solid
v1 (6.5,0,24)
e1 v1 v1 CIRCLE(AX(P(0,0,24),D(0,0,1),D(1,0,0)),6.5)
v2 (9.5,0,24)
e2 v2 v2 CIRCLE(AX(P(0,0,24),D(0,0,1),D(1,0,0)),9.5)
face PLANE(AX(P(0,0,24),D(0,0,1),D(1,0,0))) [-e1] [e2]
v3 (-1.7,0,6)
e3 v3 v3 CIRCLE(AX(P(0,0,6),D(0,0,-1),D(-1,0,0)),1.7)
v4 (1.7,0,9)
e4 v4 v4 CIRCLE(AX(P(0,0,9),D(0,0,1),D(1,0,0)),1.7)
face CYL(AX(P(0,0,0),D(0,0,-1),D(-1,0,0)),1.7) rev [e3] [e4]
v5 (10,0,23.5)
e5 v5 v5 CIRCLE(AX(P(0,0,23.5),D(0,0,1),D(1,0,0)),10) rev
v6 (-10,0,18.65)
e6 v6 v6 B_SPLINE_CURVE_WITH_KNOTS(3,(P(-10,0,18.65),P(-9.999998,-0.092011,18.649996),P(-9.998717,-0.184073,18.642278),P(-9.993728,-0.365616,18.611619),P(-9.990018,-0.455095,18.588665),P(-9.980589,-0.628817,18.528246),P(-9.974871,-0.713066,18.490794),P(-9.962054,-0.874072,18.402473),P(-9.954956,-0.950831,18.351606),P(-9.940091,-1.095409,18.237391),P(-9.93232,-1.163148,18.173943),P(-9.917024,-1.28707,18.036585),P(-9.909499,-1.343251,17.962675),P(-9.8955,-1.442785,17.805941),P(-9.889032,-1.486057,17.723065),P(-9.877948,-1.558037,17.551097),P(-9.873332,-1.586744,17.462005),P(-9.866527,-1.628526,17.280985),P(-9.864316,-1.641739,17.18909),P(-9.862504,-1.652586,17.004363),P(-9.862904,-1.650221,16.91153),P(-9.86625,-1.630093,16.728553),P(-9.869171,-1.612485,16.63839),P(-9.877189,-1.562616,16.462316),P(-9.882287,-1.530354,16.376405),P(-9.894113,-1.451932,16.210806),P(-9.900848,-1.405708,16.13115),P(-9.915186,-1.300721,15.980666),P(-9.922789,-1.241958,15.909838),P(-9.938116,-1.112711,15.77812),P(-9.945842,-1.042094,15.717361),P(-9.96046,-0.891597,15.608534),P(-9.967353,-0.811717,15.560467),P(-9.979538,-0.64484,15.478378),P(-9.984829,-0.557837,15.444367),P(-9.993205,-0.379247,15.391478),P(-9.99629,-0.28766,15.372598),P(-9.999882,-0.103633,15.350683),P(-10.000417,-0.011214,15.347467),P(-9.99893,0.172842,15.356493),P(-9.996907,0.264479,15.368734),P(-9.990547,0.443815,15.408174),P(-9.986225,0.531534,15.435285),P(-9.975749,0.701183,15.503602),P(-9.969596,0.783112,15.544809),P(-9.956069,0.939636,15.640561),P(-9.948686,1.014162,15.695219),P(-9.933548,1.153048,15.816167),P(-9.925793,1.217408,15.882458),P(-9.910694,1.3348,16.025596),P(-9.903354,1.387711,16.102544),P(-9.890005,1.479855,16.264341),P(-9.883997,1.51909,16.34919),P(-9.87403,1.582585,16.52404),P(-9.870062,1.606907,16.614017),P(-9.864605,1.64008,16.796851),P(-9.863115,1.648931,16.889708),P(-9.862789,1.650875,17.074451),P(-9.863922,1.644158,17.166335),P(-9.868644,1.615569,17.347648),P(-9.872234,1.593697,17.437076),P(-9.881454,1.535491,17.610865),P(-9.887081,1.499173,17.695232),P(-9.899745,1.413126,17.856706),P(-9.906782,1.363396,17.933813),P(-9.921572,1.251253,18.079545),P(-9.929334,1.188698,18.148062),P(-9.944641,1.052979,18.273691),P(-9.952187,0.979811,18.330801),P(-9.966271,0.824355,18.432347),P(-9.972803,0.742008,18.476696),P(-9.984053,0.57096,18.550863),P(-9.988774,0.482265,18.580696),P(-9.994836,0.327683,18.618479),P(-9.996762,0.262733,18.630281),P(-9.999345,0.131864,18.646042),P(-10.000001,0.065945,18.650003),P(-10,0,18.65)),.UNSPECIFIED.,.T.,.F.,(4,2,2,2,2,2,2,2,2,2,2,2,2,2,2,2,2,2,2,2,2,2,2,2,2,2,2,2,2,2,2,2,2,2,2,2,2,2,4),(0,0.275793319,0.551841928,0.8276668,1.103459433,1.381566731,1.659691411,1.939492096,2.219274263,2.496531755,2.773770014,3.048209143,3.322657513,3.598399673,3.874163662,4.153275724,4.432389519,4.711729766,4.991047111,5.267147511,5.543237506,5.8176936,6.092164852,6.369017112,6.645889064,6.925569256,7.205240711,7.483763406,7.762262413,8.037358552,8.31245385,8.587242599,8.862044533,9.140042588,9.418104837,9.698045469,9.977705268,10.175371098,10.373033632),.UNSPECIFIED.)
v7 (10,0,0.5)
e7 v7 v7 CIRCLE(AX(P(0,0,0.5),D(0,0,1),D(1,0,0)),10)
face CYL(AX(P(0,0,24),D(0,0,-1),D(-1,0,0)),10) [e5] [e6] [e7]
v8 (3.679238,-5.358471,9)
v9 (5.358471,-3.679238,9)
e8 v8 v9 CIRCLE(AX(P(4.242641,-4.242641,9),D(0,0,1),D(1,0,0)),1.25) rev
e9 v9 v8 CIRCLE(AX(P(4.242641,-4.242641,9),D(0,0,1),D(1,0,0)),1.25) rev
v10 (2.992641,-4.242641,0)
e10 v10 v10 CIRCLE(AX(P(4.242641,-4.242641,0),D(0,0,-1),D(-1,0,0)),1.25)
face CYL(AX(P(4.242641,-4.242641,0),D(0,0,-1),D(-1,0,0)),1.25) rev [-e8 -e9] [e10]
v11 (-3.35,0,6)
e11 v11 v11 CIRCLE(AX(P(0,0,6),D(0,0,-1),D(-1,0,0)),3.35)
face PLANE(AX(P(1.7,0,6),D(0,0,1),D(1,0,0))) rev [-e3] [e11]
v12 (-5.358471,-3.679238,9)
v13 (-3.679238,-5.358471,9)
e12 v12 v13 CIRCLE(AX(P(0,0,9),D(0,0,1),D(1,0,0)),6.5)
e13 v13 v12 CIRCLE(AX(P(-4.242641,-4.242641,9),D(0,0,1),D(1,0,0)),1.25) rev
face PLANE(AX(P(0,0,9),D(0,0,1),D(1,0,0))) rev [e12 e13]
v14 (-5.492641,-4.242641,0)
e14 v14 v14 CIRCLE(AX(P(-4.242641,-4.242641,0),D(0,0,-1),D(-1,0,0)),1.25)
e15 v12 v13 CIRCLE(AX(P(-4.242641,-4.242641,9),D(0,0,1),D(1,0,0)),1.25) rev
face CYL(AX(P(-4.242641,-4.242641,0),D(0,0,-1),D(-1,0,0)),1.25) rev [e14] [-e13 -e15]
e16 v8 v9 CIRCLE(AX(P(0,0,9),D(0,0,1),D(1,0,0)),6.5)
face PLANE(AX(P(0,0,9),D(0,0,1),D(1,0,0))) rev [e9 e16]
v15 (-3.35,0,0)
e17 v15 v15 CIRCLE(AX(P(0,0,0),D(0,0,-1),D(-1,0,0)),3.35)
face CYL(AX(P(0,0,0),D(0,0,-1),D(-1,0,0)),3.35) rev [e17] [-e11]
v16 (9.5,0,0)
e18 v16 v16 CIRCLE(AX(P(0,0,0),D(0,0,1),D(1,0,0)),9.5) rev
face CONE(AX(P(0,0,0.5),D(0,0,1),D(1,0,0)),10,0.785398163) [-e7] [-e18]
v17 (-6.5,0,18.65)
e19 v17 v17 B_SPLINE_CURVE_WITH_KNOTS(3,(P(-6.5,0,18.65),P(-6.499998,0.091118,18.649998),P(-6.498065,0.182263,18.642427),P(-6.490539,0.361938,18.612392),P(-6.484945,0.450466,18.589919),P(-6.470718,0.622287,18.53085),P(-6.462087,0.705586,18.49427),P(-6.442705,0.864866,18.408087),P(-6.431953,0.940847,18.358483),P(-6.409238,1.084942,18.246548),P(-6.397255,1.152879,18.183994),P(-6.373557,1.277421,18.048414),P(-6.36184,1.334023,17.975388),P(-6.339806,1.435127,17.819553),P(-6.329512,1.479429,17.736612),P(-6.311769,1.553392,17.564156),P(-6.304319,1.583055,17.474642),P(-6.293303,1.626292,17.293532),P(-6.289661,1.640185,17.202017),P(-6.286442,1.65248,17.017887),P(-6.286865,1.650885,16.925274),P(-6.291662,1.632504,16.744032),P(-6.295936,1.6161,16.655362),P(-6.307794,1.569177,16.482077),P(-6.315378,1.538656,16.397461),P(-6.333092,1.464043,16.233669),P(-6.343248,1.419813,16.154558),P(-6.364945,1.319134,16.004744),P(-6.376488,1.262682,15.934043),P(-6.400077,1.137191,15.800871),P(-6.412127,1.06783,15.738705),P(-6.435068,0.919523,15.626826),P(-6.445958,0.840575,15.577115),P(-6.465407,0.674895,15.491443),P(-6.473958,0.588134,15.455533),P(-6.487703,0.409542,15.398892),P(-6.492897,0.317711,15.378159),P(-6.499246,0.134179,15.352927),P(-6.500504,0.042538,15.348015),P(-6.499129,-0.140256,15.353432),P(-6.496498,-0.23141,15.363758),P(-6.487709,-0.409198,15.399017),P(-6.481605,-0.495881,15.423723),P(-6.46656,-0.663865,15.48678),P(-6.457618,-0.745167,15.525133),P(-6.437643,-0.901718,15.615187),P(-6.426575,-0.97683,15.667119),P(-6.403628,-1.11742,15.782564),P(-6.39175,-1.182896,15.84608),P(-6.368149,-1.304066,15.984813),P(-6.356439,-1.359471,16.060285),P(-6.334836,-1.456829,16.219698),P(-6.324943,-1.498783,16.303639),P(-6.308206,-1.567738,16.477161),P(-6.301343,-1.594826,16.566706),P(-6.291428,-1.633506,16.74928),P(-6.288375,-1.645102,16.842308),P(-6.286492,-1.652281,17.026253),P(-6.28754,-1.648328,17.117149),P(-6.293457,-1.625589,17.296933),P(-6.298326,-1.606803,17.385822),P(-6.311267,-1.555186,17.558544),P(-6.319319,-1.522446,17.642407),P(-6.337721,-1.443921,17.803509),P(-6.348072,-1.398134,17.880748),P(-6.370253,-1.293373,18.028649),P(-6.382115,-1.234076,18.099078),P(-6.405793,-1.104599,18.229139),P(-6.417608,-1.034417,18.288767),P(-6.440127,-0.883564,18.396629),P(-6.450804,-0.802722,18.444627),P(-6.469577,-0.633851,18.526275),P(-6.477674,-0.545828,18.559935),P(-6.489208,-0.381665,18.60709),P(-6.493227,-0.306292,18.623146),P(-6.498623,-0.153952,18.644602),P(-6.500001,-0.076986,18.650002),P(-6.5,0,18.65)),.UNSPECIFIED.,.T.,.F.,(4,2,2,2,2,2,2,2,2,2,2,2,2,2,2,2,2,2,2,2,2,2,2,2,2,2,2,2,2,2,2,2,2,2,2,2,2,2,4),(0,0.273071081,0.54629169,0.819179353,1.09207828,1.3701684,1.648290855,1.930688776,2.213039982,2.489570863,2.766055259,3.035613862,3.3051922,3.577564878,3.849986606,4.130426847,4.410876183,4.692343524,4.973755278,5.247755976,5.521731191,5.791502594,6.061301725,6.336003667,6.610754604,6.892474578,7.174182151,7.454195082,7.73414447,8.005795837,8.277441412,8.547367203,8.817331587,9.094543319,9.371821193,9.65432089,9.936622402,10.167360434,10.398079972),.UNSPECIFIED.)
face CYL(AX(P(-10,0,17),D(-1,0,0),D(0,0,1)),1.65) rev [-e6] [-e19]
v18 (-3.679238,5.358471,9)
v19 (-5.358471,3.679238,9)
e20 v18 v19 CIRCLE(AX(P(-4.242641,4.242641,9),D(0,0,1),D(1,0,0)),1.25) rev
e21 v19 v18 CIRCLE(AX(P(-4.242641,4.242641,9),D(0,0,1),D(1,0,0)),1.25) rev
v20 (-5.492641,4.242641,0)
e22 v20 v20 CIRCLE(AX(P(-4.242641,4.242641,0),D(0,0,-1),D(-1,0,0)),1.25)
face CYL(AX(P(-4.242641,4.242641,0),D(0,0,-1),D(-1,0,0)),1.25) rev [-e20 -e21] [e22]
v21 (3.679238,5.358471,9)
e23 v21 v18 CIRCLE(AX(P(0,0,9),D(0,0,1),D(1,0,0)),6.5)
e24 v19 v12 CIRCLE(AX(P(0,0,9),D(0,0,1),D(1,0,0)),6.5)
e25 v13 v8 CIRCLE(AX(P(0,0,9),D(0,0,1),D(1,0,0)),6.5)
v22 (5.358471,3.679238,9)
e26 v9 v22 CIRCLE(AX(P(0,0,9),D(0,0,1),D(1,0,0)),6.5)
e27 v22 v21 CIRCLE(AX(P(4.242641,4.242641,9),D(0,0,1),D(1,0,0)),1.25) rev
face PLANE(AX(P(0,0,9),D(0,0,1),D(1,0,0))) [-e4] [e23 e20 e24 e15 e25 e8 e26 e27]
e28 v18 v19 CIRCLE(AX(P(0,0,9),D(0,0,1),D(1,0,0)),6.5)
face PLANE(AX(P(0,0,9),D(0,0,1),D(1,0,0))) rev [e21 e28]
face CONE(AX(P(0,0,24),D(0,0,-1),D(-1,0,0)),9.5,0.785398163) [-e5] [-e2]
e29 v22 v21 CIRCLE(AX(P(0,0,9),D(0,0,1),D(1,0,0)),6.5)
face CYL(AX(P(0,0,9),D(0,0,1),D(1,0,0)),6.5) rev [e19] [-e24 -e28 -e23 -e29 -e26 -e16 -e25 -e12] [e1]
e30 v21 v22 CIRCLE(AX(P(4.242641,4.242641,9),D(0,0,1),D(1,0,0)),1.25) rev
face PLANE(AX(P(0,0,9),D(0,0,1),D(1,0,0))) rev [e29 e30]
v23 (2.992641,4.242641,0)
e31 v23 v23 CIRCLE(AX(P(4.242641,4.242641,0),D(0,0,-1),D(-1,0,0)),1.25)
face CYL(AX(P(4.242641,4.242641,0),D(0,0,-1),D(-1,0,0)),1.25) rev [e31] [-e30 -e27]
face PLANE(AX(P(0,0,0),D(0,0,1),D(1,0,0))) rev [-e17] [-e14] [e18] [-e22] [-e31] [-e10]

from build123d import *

# Parameters (mm, degrees)
SKETCH_1_R                  = 10
EXTRUDE_1_DEPTH             = 24
SKETCH_2_R                  = 6.5
CUT_EXTRUDE_1_DEPTH         = 15
M4X0_71_D                   = 3.3
M4X0_71_DEPTH               = 5
M4X0_71_TIP                 = 0.991420021
M3X0_51_OUTLINE_R           = 1.25
M3X0_51_DEPTH               = 9
HOLE_WIZARD_M31_D           = 3.4
HOLE_WIZARD_M31_CBORE_D     = 6.7
HOLE_WIZARD_M31_CBORE_DEPTH = 6
CHAMFER_1_SIZE              = 0.5


# Read off the part's stored shape, not the designer's step: Отверстие обработанное метчиком M3x0.51
with BuildPart() as part:
    # Эскиз1 → Бобышка-Вытянуть1 (new body)
    with BuildSketch(Plane.XY):
        Circle(SKETCH_1_R)
    extrude(amount=EXTRUDE_1_DEPTH)

    # Эскиз2 → Вырез-Вытянуть1 (cut)
    with BuildSketch(Plane.XY.offset(24)):
        Circle(SKETCH_2_R)
    extrude(amount=-CUT_EXTRUDE_1_DEPTH, mode=Mode.SUBTRACT)

    # Отверстие обработанное метчиком M4x0.71
    with Locations(Plane(origin=(-10, 0, 0), x_dir=(0, 0, -1), z_dir=(-1, 0, 0))):
        with Locations((-17, 0)):
            Hole(M4X0_71_D / 2, depth=M4X0_71_DEPTH)
            with Locations((0, 0, -(M4X0_71_DEPTH + M4X0_71_TIP / 2))):  # 118° drill point
                Cone(0, M4X0_71_D / 2, M4X0_71_TIP, mode=Mode.SUBTRACT)

    # Отверстие обработанное метчиком M3x0.51 outline → Отверстие обработанное метчиком M3x0.51 (cut)
    with BuildSketch(Plane.XY):
        with Locations((4.242640687, -4.242640687)):
            Circle(M3X0_51_OUTLINE_R)
        with Locations((-4.242640687, -4.242640687)):
            Circle(M3X0_51_OUTLINE_R)
        with Locations((-4.242640687, 4.242640687)):
            Circle(M3X0_51_OUTLINE_R)
        with Locations((4.242640687, 4.242640687)):
            Circle(M3X0_51_OUTLINE_R)
    extrude(amount=M3X0_51_DEPTH, mode=Mode.SUBTRACT)

    # Цековка для  винта с полукруглой головкой M31 (through all)
    with Locations(Plane(origin=(0, 0, 0), x_dir=(-1, 0, 0), z_dir=(0, 0, -1))):
        with Locations((0, 0)):
            CounterBoreHole(HOLE_WIZARD_M31_D / 2, HOLE_WIZARD_M31_CBORE_D / 2, HOLE_WIZARD_M31_CBORE_DEPTH)

    # Фаска1
    chamfer_1_edges = [part.edges().sort_by_distance(p)[0] for p in [
        (-10, 0, 0),
        (-10, 0, 24),
    ]]
    chamfer(chamfer_1_edges, length=CHAMFER_1_SIZE)


solid = part.part
